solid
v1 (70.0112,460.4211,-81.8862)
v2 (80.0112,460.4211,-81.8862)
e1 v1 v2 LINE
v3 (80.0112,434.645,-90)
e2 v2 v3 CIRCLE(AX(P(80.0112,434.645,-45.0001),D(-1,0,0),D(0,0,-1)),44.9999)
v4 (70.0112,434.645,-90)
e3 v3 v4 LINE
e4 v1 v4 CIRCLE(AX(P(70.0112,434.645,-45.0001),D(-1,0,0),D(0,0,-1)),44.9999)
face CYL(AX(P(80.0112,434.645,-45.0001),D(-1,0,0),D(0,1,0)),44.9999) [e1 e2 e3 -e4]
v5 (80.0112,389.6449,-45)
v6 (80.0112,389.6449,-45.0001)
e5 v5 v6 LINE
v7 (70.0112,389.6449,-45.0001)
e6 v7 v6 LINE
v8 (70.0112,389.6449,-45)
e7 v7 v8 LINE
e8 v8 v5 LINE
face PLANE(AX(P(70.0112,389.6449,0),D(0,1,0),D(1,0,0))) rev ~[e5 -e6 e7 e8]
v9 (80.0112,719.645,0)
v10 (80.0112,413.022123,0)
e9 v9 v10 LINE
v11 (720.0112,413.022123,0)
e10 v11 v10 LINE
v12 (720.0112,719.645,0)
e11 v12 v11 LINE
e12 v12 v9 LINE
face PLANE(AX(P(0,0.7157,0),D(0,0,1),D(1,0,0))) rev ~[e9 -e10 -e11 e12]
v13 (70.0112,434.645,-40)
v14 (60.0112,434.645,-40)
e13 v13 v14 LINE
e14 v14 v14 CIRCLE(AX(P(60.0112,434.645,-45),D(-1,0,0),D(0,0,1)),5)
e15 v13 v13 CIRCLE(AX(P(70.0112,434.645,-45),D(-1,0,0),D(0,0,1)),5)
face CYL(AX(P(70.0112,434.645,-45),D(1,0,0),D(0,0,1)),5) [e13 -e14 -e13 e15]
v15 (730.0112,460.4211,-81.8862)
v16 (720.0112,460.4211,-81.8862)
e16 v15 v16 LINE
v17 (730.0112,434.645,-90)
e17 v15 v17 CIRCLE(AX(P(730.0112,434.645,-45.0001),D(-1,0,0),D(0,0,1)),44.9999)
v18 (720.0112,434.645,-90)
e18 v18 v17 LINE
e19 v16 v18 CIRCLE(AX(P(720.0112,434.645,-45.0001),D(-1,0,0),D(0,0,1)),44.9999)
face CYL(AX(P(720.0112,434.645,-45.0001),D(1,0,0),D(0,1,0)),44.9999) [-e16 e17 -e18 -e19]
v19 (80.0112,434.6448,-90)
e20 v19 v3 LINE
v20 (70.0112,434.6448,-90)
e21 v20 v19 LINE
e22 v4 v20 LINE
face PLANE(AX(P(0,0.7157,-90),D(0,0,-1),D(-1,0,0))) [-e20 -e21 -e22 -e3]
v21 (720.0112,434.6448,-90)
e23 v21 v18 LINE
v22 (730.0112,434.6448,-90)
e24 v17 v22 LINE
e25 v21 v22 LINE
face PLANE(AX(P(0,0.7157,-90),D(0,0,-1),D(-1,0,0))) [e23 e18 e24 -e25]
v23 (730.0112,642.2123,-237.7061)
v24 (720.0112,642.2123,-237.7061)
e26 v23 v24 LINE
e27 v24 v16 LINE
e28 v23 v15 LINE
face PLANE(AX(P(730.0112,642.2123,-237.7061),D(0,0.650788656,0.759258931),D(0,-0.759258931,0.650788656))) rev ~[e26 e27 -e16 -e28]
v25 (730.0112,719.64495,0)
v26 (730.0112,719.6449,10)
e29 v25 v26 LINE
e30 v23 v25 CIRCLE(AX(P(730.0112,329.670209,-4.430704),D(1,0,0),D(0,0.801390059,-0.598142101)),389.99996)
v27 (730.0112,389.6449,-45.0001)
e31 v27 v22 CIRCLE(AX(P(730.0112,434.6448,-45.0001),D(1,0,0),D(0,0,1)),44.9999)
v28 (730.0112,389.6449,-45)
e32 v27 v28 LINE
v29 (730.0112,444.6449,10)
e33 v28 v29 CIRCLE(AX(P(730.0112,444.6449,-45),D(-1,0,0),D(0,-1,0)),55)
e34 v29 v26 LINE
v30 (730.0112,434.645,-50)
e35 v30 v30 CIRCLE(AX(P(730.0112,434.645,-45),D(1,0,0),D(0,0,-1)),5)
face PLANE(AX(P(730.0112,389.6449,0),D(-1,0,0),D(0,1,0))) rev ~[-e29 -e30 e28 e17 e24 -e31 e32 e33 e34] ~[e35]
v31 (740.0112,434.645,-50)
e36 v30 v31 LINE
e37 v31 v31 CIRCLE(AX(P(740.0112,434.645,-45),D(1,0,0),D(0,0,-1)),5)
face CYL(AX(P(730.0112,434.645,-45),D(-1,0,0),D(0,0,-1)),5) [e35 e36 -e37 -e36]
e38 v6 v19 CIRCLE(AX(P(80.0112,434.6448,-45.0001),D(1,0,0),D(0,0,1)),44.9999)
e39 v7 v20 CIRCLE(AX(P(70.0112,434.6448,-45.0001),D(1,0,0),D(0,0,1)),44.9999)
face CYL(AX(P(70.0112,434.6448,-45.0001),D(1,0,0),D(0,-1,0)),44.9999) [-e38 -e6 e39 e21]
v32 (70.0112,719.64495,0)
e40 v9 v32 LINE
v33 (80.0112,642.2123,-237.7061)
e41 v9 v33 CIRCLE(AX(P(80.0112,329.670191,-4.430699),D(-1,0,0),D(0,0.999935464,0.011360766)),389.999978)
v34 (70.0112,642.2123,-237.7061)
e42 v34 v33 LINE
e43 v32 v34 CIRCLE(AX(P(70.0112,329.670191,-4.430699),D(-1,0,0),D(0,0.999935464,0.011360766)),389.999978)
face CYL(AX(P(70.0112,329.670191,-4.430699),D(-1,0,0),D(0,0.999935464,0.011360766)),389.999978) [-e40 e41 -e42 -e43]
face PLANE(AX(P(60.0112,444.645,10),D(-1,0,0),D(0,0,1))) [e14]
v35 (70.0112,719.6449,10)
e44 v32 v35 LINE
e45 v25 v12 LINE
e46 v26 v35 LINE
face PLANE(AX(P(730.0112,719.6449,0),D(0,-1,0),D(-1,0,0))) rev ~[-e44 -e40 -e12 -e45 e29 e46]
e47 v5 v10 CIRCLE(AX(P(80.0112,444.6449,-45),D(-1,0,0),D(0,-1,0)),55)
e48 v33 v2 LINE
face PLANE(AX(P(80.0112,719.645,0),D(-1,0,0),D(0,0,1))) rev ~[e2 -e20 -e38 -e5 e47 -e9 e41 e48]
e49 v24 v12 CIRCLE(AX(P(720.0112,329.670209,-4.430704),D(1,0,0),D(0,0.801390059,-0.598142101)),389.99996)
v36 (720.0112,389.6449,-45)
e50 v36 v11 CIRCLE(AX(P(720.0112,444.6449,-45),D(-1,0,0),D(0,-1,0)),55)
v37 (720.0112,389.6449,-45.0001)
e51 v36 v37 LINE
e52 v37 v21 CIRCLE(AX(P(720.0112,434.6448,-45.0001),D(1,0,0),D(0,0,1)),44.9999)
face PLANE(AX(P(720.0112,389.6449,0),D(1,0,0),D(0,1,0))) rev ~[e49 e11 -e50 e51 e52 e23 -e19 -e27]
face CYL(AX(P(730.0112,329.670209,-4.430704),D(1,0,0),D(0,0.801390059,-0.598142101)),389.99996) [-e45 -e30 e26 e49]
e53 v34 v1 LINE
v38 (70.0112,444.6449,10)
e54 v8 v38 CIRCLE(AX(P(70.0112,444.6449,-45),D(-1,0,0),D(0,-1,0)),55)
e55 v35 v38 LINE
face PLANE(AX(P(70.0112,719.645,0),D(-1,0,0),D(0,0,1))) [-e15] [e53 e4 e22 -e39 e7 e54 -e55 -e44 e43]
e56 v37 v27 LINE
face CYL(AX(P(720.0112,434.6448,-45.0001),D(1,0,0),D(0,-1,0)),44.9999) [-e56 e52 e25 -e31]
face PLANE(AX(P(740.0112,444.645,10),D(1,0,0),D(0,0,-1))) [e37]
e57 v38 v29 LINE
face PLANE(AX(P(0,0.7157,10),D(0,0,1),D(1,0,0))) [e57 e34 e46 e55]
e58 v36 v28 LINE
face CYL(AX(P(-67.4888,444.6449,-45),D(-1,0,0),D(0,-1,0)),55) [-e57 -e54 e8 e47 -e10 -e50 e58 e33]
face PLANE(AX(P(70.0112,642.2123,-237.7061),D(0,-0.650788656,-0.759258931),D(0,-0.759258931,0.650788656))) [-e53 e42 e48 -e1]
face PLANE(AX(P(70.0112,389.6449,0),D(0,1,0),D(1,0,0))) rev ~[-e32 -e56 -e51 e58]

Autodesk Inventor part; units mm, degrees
ref_plane "YZ Plane" through (0, 0, 0) normal (1, 0, 0) x (0, 1, 0)
ref_plane "XZ Plane" through (0, 0, 0) normal (0, 1, 0) x (-1, 0, 0)
ref_plane "XY Plane" through (0, 0, 0) normal (0, 0, 1) x (1, 0, 0)
ref_plane "작업 평면1" through (0, 0.7157, 0) normal (0, 0, 1) x (1, 0, 0)
sketch "스케치1" plane through (0, 0.7157, 0) normal (0, 0, 1) x (1, 0, 0)
  line L0 (70.0112, 388.9292) -> (730.0112, 388.9292)
  line L1 (730.0112, 388.9292) -> (730.0112, 718.9292)
  line L2 (730.0112, 718.9292) -> (70.0112, 718.9292)
  line L3 (70.0112, 718.9292) -> (70.0112, 388.9292)
  point P0 (0, -0.7157)
  dimension "d0" = 660
  dimension "d1" = 330
extrude "돌출1" add sketch "스케치1" along normal blind 10
sketch "스케치2" plane through (0, 0.7157, 0) normal (0, 0, -1) x (-1, 0, 0)
  line L0 (-70.0112, 388.9292) -> (-730.0112, 388.9292) projected
  line L1 (-730.0112, 388.9292) -> (-720.0112, 388.9292)
  line L2 (-720.0112, 388.9292) -> (-720.0112, 478.9292)
  line L3 (-720.0112, 478.9292) -> (-730.0112, 478.9292)
  line L4 (-730.0112, 478.9292) -> (-730.0112, 388.9292)
  line L5 (-70.0112, 388.9292) -> (-80.0112, 388.9292)
  line L6 (-80.0112, 388.9292) -> (-80.0112, 478.9292)
  line L7 (-80.0112, 478.9292) -> (-70.0112, 478.9292)
  line L8 (-70.0112, 478.9292) -> (-70.0112, 388.9292)
  point P0 (0, -0.7157)
  dimension "d4" = 10
  dimension "d5" = 90
  dimension "d6" = 10
  dimension "d7" = 90
extrude "돌출2" add sketch "스케치2" along normal blind 90
fillet "모깎기1" radius 45 4 edges at (725.0112, 479.645, -90) (725.0112, 389.645, -90) (75.0112, 479.645, -90) (75.0112, 389.645, -90)
fillet "모깎기2" radius 55 1 edges at (400.0112, 389.645, 10)
sketch "스케치3" plane through (730.0112, 719.645, 10) normal (1, 0, 0) x (0, 0, -1)
  line L0 (10, -240) -> (10, 0) projected
  arc A0 (247.7061, -77.4327) -> (10, 0) centre (14.4307, -389.9748) ccw
  line L1 (10, 0) -> (10, -240)
  line L2 (247.7061, -77.4327) -> (91.8862, -259.2239)
  arc A1 (55, -330) -> (55, -240) centre (55, -285) ccw projected
  line L3 (10, -240) -> (55, -240) projected
  line L4 (10, -240) -> (55, -240)
  arc A2 (91.8862, -259.2239) -> (55, -240) centre (55, -285) ccw
  point P0 (10, -719.645)
  dimension "d12" = 250
  dimension "d13" = 390
extrude "돌출3" add sketch "스케치3" against normal blind 10
sketch "스케치4" plane through (70.0112, 719.645, 0) normal (-1, 0, 0) x (0, 0, 1)
  line L0 (-237.7061, -77.4327) -> (-81.8862, -259.2239) projected
  line L1 (-237.7061, -77.4327) -> (-81.8862, -259.2239)
  line L2 (0, 0) -> (10, 0) projected
  arc A0 (0, 0) -> (-237.7061, -77.4327) centre (-4.4307, -389.9748) ccw
  line L3 (0, 0) -> (0, -240) projected
  line L4 (0, 0) -> (0, -240)
  arc A1 (-45, -240) -> (-45, -330) centre (-45, -285) ccw projected
  line L5 (0, -240) -> (-45, -240)
  arc A2 (-45, -240) -> (-81.8862, -259.2239) centre (-45, -285) ccw
  point P0 (0, -719.645)
extrude "돌출4" add sketch "스케치4" against normal blind 10
sketch "스케치5" plane through (730.0112, 444.645, 10) normal (1, 0, 0) x (0, 0, -1)
  arc A0 (55, -55) -> (91.8862, 15.7761) centre (55, -10) ccw projected
  circle A1 centre (55, -10) radius 5
  point P0 (10, -444.645)
  dimension "d18" = 10
extrude "돌출5" add sketch "스케치5" along normal blind 10
sketch "스케치6" plane through (70.0112, 444.645, 10) normal (-1, 0, 0) x (0, 0, 1)
  arc A0 (-91.8862, 15.7761) -> (-55, -55) centre (-55, -10) ccw projected
  circle A1 centre (-55, -10) radius 5
  point P0 (-10, -444.645)
extrude "돌출6" add sketch "스케치6" along normal blind 10
properties part number "앞문"
